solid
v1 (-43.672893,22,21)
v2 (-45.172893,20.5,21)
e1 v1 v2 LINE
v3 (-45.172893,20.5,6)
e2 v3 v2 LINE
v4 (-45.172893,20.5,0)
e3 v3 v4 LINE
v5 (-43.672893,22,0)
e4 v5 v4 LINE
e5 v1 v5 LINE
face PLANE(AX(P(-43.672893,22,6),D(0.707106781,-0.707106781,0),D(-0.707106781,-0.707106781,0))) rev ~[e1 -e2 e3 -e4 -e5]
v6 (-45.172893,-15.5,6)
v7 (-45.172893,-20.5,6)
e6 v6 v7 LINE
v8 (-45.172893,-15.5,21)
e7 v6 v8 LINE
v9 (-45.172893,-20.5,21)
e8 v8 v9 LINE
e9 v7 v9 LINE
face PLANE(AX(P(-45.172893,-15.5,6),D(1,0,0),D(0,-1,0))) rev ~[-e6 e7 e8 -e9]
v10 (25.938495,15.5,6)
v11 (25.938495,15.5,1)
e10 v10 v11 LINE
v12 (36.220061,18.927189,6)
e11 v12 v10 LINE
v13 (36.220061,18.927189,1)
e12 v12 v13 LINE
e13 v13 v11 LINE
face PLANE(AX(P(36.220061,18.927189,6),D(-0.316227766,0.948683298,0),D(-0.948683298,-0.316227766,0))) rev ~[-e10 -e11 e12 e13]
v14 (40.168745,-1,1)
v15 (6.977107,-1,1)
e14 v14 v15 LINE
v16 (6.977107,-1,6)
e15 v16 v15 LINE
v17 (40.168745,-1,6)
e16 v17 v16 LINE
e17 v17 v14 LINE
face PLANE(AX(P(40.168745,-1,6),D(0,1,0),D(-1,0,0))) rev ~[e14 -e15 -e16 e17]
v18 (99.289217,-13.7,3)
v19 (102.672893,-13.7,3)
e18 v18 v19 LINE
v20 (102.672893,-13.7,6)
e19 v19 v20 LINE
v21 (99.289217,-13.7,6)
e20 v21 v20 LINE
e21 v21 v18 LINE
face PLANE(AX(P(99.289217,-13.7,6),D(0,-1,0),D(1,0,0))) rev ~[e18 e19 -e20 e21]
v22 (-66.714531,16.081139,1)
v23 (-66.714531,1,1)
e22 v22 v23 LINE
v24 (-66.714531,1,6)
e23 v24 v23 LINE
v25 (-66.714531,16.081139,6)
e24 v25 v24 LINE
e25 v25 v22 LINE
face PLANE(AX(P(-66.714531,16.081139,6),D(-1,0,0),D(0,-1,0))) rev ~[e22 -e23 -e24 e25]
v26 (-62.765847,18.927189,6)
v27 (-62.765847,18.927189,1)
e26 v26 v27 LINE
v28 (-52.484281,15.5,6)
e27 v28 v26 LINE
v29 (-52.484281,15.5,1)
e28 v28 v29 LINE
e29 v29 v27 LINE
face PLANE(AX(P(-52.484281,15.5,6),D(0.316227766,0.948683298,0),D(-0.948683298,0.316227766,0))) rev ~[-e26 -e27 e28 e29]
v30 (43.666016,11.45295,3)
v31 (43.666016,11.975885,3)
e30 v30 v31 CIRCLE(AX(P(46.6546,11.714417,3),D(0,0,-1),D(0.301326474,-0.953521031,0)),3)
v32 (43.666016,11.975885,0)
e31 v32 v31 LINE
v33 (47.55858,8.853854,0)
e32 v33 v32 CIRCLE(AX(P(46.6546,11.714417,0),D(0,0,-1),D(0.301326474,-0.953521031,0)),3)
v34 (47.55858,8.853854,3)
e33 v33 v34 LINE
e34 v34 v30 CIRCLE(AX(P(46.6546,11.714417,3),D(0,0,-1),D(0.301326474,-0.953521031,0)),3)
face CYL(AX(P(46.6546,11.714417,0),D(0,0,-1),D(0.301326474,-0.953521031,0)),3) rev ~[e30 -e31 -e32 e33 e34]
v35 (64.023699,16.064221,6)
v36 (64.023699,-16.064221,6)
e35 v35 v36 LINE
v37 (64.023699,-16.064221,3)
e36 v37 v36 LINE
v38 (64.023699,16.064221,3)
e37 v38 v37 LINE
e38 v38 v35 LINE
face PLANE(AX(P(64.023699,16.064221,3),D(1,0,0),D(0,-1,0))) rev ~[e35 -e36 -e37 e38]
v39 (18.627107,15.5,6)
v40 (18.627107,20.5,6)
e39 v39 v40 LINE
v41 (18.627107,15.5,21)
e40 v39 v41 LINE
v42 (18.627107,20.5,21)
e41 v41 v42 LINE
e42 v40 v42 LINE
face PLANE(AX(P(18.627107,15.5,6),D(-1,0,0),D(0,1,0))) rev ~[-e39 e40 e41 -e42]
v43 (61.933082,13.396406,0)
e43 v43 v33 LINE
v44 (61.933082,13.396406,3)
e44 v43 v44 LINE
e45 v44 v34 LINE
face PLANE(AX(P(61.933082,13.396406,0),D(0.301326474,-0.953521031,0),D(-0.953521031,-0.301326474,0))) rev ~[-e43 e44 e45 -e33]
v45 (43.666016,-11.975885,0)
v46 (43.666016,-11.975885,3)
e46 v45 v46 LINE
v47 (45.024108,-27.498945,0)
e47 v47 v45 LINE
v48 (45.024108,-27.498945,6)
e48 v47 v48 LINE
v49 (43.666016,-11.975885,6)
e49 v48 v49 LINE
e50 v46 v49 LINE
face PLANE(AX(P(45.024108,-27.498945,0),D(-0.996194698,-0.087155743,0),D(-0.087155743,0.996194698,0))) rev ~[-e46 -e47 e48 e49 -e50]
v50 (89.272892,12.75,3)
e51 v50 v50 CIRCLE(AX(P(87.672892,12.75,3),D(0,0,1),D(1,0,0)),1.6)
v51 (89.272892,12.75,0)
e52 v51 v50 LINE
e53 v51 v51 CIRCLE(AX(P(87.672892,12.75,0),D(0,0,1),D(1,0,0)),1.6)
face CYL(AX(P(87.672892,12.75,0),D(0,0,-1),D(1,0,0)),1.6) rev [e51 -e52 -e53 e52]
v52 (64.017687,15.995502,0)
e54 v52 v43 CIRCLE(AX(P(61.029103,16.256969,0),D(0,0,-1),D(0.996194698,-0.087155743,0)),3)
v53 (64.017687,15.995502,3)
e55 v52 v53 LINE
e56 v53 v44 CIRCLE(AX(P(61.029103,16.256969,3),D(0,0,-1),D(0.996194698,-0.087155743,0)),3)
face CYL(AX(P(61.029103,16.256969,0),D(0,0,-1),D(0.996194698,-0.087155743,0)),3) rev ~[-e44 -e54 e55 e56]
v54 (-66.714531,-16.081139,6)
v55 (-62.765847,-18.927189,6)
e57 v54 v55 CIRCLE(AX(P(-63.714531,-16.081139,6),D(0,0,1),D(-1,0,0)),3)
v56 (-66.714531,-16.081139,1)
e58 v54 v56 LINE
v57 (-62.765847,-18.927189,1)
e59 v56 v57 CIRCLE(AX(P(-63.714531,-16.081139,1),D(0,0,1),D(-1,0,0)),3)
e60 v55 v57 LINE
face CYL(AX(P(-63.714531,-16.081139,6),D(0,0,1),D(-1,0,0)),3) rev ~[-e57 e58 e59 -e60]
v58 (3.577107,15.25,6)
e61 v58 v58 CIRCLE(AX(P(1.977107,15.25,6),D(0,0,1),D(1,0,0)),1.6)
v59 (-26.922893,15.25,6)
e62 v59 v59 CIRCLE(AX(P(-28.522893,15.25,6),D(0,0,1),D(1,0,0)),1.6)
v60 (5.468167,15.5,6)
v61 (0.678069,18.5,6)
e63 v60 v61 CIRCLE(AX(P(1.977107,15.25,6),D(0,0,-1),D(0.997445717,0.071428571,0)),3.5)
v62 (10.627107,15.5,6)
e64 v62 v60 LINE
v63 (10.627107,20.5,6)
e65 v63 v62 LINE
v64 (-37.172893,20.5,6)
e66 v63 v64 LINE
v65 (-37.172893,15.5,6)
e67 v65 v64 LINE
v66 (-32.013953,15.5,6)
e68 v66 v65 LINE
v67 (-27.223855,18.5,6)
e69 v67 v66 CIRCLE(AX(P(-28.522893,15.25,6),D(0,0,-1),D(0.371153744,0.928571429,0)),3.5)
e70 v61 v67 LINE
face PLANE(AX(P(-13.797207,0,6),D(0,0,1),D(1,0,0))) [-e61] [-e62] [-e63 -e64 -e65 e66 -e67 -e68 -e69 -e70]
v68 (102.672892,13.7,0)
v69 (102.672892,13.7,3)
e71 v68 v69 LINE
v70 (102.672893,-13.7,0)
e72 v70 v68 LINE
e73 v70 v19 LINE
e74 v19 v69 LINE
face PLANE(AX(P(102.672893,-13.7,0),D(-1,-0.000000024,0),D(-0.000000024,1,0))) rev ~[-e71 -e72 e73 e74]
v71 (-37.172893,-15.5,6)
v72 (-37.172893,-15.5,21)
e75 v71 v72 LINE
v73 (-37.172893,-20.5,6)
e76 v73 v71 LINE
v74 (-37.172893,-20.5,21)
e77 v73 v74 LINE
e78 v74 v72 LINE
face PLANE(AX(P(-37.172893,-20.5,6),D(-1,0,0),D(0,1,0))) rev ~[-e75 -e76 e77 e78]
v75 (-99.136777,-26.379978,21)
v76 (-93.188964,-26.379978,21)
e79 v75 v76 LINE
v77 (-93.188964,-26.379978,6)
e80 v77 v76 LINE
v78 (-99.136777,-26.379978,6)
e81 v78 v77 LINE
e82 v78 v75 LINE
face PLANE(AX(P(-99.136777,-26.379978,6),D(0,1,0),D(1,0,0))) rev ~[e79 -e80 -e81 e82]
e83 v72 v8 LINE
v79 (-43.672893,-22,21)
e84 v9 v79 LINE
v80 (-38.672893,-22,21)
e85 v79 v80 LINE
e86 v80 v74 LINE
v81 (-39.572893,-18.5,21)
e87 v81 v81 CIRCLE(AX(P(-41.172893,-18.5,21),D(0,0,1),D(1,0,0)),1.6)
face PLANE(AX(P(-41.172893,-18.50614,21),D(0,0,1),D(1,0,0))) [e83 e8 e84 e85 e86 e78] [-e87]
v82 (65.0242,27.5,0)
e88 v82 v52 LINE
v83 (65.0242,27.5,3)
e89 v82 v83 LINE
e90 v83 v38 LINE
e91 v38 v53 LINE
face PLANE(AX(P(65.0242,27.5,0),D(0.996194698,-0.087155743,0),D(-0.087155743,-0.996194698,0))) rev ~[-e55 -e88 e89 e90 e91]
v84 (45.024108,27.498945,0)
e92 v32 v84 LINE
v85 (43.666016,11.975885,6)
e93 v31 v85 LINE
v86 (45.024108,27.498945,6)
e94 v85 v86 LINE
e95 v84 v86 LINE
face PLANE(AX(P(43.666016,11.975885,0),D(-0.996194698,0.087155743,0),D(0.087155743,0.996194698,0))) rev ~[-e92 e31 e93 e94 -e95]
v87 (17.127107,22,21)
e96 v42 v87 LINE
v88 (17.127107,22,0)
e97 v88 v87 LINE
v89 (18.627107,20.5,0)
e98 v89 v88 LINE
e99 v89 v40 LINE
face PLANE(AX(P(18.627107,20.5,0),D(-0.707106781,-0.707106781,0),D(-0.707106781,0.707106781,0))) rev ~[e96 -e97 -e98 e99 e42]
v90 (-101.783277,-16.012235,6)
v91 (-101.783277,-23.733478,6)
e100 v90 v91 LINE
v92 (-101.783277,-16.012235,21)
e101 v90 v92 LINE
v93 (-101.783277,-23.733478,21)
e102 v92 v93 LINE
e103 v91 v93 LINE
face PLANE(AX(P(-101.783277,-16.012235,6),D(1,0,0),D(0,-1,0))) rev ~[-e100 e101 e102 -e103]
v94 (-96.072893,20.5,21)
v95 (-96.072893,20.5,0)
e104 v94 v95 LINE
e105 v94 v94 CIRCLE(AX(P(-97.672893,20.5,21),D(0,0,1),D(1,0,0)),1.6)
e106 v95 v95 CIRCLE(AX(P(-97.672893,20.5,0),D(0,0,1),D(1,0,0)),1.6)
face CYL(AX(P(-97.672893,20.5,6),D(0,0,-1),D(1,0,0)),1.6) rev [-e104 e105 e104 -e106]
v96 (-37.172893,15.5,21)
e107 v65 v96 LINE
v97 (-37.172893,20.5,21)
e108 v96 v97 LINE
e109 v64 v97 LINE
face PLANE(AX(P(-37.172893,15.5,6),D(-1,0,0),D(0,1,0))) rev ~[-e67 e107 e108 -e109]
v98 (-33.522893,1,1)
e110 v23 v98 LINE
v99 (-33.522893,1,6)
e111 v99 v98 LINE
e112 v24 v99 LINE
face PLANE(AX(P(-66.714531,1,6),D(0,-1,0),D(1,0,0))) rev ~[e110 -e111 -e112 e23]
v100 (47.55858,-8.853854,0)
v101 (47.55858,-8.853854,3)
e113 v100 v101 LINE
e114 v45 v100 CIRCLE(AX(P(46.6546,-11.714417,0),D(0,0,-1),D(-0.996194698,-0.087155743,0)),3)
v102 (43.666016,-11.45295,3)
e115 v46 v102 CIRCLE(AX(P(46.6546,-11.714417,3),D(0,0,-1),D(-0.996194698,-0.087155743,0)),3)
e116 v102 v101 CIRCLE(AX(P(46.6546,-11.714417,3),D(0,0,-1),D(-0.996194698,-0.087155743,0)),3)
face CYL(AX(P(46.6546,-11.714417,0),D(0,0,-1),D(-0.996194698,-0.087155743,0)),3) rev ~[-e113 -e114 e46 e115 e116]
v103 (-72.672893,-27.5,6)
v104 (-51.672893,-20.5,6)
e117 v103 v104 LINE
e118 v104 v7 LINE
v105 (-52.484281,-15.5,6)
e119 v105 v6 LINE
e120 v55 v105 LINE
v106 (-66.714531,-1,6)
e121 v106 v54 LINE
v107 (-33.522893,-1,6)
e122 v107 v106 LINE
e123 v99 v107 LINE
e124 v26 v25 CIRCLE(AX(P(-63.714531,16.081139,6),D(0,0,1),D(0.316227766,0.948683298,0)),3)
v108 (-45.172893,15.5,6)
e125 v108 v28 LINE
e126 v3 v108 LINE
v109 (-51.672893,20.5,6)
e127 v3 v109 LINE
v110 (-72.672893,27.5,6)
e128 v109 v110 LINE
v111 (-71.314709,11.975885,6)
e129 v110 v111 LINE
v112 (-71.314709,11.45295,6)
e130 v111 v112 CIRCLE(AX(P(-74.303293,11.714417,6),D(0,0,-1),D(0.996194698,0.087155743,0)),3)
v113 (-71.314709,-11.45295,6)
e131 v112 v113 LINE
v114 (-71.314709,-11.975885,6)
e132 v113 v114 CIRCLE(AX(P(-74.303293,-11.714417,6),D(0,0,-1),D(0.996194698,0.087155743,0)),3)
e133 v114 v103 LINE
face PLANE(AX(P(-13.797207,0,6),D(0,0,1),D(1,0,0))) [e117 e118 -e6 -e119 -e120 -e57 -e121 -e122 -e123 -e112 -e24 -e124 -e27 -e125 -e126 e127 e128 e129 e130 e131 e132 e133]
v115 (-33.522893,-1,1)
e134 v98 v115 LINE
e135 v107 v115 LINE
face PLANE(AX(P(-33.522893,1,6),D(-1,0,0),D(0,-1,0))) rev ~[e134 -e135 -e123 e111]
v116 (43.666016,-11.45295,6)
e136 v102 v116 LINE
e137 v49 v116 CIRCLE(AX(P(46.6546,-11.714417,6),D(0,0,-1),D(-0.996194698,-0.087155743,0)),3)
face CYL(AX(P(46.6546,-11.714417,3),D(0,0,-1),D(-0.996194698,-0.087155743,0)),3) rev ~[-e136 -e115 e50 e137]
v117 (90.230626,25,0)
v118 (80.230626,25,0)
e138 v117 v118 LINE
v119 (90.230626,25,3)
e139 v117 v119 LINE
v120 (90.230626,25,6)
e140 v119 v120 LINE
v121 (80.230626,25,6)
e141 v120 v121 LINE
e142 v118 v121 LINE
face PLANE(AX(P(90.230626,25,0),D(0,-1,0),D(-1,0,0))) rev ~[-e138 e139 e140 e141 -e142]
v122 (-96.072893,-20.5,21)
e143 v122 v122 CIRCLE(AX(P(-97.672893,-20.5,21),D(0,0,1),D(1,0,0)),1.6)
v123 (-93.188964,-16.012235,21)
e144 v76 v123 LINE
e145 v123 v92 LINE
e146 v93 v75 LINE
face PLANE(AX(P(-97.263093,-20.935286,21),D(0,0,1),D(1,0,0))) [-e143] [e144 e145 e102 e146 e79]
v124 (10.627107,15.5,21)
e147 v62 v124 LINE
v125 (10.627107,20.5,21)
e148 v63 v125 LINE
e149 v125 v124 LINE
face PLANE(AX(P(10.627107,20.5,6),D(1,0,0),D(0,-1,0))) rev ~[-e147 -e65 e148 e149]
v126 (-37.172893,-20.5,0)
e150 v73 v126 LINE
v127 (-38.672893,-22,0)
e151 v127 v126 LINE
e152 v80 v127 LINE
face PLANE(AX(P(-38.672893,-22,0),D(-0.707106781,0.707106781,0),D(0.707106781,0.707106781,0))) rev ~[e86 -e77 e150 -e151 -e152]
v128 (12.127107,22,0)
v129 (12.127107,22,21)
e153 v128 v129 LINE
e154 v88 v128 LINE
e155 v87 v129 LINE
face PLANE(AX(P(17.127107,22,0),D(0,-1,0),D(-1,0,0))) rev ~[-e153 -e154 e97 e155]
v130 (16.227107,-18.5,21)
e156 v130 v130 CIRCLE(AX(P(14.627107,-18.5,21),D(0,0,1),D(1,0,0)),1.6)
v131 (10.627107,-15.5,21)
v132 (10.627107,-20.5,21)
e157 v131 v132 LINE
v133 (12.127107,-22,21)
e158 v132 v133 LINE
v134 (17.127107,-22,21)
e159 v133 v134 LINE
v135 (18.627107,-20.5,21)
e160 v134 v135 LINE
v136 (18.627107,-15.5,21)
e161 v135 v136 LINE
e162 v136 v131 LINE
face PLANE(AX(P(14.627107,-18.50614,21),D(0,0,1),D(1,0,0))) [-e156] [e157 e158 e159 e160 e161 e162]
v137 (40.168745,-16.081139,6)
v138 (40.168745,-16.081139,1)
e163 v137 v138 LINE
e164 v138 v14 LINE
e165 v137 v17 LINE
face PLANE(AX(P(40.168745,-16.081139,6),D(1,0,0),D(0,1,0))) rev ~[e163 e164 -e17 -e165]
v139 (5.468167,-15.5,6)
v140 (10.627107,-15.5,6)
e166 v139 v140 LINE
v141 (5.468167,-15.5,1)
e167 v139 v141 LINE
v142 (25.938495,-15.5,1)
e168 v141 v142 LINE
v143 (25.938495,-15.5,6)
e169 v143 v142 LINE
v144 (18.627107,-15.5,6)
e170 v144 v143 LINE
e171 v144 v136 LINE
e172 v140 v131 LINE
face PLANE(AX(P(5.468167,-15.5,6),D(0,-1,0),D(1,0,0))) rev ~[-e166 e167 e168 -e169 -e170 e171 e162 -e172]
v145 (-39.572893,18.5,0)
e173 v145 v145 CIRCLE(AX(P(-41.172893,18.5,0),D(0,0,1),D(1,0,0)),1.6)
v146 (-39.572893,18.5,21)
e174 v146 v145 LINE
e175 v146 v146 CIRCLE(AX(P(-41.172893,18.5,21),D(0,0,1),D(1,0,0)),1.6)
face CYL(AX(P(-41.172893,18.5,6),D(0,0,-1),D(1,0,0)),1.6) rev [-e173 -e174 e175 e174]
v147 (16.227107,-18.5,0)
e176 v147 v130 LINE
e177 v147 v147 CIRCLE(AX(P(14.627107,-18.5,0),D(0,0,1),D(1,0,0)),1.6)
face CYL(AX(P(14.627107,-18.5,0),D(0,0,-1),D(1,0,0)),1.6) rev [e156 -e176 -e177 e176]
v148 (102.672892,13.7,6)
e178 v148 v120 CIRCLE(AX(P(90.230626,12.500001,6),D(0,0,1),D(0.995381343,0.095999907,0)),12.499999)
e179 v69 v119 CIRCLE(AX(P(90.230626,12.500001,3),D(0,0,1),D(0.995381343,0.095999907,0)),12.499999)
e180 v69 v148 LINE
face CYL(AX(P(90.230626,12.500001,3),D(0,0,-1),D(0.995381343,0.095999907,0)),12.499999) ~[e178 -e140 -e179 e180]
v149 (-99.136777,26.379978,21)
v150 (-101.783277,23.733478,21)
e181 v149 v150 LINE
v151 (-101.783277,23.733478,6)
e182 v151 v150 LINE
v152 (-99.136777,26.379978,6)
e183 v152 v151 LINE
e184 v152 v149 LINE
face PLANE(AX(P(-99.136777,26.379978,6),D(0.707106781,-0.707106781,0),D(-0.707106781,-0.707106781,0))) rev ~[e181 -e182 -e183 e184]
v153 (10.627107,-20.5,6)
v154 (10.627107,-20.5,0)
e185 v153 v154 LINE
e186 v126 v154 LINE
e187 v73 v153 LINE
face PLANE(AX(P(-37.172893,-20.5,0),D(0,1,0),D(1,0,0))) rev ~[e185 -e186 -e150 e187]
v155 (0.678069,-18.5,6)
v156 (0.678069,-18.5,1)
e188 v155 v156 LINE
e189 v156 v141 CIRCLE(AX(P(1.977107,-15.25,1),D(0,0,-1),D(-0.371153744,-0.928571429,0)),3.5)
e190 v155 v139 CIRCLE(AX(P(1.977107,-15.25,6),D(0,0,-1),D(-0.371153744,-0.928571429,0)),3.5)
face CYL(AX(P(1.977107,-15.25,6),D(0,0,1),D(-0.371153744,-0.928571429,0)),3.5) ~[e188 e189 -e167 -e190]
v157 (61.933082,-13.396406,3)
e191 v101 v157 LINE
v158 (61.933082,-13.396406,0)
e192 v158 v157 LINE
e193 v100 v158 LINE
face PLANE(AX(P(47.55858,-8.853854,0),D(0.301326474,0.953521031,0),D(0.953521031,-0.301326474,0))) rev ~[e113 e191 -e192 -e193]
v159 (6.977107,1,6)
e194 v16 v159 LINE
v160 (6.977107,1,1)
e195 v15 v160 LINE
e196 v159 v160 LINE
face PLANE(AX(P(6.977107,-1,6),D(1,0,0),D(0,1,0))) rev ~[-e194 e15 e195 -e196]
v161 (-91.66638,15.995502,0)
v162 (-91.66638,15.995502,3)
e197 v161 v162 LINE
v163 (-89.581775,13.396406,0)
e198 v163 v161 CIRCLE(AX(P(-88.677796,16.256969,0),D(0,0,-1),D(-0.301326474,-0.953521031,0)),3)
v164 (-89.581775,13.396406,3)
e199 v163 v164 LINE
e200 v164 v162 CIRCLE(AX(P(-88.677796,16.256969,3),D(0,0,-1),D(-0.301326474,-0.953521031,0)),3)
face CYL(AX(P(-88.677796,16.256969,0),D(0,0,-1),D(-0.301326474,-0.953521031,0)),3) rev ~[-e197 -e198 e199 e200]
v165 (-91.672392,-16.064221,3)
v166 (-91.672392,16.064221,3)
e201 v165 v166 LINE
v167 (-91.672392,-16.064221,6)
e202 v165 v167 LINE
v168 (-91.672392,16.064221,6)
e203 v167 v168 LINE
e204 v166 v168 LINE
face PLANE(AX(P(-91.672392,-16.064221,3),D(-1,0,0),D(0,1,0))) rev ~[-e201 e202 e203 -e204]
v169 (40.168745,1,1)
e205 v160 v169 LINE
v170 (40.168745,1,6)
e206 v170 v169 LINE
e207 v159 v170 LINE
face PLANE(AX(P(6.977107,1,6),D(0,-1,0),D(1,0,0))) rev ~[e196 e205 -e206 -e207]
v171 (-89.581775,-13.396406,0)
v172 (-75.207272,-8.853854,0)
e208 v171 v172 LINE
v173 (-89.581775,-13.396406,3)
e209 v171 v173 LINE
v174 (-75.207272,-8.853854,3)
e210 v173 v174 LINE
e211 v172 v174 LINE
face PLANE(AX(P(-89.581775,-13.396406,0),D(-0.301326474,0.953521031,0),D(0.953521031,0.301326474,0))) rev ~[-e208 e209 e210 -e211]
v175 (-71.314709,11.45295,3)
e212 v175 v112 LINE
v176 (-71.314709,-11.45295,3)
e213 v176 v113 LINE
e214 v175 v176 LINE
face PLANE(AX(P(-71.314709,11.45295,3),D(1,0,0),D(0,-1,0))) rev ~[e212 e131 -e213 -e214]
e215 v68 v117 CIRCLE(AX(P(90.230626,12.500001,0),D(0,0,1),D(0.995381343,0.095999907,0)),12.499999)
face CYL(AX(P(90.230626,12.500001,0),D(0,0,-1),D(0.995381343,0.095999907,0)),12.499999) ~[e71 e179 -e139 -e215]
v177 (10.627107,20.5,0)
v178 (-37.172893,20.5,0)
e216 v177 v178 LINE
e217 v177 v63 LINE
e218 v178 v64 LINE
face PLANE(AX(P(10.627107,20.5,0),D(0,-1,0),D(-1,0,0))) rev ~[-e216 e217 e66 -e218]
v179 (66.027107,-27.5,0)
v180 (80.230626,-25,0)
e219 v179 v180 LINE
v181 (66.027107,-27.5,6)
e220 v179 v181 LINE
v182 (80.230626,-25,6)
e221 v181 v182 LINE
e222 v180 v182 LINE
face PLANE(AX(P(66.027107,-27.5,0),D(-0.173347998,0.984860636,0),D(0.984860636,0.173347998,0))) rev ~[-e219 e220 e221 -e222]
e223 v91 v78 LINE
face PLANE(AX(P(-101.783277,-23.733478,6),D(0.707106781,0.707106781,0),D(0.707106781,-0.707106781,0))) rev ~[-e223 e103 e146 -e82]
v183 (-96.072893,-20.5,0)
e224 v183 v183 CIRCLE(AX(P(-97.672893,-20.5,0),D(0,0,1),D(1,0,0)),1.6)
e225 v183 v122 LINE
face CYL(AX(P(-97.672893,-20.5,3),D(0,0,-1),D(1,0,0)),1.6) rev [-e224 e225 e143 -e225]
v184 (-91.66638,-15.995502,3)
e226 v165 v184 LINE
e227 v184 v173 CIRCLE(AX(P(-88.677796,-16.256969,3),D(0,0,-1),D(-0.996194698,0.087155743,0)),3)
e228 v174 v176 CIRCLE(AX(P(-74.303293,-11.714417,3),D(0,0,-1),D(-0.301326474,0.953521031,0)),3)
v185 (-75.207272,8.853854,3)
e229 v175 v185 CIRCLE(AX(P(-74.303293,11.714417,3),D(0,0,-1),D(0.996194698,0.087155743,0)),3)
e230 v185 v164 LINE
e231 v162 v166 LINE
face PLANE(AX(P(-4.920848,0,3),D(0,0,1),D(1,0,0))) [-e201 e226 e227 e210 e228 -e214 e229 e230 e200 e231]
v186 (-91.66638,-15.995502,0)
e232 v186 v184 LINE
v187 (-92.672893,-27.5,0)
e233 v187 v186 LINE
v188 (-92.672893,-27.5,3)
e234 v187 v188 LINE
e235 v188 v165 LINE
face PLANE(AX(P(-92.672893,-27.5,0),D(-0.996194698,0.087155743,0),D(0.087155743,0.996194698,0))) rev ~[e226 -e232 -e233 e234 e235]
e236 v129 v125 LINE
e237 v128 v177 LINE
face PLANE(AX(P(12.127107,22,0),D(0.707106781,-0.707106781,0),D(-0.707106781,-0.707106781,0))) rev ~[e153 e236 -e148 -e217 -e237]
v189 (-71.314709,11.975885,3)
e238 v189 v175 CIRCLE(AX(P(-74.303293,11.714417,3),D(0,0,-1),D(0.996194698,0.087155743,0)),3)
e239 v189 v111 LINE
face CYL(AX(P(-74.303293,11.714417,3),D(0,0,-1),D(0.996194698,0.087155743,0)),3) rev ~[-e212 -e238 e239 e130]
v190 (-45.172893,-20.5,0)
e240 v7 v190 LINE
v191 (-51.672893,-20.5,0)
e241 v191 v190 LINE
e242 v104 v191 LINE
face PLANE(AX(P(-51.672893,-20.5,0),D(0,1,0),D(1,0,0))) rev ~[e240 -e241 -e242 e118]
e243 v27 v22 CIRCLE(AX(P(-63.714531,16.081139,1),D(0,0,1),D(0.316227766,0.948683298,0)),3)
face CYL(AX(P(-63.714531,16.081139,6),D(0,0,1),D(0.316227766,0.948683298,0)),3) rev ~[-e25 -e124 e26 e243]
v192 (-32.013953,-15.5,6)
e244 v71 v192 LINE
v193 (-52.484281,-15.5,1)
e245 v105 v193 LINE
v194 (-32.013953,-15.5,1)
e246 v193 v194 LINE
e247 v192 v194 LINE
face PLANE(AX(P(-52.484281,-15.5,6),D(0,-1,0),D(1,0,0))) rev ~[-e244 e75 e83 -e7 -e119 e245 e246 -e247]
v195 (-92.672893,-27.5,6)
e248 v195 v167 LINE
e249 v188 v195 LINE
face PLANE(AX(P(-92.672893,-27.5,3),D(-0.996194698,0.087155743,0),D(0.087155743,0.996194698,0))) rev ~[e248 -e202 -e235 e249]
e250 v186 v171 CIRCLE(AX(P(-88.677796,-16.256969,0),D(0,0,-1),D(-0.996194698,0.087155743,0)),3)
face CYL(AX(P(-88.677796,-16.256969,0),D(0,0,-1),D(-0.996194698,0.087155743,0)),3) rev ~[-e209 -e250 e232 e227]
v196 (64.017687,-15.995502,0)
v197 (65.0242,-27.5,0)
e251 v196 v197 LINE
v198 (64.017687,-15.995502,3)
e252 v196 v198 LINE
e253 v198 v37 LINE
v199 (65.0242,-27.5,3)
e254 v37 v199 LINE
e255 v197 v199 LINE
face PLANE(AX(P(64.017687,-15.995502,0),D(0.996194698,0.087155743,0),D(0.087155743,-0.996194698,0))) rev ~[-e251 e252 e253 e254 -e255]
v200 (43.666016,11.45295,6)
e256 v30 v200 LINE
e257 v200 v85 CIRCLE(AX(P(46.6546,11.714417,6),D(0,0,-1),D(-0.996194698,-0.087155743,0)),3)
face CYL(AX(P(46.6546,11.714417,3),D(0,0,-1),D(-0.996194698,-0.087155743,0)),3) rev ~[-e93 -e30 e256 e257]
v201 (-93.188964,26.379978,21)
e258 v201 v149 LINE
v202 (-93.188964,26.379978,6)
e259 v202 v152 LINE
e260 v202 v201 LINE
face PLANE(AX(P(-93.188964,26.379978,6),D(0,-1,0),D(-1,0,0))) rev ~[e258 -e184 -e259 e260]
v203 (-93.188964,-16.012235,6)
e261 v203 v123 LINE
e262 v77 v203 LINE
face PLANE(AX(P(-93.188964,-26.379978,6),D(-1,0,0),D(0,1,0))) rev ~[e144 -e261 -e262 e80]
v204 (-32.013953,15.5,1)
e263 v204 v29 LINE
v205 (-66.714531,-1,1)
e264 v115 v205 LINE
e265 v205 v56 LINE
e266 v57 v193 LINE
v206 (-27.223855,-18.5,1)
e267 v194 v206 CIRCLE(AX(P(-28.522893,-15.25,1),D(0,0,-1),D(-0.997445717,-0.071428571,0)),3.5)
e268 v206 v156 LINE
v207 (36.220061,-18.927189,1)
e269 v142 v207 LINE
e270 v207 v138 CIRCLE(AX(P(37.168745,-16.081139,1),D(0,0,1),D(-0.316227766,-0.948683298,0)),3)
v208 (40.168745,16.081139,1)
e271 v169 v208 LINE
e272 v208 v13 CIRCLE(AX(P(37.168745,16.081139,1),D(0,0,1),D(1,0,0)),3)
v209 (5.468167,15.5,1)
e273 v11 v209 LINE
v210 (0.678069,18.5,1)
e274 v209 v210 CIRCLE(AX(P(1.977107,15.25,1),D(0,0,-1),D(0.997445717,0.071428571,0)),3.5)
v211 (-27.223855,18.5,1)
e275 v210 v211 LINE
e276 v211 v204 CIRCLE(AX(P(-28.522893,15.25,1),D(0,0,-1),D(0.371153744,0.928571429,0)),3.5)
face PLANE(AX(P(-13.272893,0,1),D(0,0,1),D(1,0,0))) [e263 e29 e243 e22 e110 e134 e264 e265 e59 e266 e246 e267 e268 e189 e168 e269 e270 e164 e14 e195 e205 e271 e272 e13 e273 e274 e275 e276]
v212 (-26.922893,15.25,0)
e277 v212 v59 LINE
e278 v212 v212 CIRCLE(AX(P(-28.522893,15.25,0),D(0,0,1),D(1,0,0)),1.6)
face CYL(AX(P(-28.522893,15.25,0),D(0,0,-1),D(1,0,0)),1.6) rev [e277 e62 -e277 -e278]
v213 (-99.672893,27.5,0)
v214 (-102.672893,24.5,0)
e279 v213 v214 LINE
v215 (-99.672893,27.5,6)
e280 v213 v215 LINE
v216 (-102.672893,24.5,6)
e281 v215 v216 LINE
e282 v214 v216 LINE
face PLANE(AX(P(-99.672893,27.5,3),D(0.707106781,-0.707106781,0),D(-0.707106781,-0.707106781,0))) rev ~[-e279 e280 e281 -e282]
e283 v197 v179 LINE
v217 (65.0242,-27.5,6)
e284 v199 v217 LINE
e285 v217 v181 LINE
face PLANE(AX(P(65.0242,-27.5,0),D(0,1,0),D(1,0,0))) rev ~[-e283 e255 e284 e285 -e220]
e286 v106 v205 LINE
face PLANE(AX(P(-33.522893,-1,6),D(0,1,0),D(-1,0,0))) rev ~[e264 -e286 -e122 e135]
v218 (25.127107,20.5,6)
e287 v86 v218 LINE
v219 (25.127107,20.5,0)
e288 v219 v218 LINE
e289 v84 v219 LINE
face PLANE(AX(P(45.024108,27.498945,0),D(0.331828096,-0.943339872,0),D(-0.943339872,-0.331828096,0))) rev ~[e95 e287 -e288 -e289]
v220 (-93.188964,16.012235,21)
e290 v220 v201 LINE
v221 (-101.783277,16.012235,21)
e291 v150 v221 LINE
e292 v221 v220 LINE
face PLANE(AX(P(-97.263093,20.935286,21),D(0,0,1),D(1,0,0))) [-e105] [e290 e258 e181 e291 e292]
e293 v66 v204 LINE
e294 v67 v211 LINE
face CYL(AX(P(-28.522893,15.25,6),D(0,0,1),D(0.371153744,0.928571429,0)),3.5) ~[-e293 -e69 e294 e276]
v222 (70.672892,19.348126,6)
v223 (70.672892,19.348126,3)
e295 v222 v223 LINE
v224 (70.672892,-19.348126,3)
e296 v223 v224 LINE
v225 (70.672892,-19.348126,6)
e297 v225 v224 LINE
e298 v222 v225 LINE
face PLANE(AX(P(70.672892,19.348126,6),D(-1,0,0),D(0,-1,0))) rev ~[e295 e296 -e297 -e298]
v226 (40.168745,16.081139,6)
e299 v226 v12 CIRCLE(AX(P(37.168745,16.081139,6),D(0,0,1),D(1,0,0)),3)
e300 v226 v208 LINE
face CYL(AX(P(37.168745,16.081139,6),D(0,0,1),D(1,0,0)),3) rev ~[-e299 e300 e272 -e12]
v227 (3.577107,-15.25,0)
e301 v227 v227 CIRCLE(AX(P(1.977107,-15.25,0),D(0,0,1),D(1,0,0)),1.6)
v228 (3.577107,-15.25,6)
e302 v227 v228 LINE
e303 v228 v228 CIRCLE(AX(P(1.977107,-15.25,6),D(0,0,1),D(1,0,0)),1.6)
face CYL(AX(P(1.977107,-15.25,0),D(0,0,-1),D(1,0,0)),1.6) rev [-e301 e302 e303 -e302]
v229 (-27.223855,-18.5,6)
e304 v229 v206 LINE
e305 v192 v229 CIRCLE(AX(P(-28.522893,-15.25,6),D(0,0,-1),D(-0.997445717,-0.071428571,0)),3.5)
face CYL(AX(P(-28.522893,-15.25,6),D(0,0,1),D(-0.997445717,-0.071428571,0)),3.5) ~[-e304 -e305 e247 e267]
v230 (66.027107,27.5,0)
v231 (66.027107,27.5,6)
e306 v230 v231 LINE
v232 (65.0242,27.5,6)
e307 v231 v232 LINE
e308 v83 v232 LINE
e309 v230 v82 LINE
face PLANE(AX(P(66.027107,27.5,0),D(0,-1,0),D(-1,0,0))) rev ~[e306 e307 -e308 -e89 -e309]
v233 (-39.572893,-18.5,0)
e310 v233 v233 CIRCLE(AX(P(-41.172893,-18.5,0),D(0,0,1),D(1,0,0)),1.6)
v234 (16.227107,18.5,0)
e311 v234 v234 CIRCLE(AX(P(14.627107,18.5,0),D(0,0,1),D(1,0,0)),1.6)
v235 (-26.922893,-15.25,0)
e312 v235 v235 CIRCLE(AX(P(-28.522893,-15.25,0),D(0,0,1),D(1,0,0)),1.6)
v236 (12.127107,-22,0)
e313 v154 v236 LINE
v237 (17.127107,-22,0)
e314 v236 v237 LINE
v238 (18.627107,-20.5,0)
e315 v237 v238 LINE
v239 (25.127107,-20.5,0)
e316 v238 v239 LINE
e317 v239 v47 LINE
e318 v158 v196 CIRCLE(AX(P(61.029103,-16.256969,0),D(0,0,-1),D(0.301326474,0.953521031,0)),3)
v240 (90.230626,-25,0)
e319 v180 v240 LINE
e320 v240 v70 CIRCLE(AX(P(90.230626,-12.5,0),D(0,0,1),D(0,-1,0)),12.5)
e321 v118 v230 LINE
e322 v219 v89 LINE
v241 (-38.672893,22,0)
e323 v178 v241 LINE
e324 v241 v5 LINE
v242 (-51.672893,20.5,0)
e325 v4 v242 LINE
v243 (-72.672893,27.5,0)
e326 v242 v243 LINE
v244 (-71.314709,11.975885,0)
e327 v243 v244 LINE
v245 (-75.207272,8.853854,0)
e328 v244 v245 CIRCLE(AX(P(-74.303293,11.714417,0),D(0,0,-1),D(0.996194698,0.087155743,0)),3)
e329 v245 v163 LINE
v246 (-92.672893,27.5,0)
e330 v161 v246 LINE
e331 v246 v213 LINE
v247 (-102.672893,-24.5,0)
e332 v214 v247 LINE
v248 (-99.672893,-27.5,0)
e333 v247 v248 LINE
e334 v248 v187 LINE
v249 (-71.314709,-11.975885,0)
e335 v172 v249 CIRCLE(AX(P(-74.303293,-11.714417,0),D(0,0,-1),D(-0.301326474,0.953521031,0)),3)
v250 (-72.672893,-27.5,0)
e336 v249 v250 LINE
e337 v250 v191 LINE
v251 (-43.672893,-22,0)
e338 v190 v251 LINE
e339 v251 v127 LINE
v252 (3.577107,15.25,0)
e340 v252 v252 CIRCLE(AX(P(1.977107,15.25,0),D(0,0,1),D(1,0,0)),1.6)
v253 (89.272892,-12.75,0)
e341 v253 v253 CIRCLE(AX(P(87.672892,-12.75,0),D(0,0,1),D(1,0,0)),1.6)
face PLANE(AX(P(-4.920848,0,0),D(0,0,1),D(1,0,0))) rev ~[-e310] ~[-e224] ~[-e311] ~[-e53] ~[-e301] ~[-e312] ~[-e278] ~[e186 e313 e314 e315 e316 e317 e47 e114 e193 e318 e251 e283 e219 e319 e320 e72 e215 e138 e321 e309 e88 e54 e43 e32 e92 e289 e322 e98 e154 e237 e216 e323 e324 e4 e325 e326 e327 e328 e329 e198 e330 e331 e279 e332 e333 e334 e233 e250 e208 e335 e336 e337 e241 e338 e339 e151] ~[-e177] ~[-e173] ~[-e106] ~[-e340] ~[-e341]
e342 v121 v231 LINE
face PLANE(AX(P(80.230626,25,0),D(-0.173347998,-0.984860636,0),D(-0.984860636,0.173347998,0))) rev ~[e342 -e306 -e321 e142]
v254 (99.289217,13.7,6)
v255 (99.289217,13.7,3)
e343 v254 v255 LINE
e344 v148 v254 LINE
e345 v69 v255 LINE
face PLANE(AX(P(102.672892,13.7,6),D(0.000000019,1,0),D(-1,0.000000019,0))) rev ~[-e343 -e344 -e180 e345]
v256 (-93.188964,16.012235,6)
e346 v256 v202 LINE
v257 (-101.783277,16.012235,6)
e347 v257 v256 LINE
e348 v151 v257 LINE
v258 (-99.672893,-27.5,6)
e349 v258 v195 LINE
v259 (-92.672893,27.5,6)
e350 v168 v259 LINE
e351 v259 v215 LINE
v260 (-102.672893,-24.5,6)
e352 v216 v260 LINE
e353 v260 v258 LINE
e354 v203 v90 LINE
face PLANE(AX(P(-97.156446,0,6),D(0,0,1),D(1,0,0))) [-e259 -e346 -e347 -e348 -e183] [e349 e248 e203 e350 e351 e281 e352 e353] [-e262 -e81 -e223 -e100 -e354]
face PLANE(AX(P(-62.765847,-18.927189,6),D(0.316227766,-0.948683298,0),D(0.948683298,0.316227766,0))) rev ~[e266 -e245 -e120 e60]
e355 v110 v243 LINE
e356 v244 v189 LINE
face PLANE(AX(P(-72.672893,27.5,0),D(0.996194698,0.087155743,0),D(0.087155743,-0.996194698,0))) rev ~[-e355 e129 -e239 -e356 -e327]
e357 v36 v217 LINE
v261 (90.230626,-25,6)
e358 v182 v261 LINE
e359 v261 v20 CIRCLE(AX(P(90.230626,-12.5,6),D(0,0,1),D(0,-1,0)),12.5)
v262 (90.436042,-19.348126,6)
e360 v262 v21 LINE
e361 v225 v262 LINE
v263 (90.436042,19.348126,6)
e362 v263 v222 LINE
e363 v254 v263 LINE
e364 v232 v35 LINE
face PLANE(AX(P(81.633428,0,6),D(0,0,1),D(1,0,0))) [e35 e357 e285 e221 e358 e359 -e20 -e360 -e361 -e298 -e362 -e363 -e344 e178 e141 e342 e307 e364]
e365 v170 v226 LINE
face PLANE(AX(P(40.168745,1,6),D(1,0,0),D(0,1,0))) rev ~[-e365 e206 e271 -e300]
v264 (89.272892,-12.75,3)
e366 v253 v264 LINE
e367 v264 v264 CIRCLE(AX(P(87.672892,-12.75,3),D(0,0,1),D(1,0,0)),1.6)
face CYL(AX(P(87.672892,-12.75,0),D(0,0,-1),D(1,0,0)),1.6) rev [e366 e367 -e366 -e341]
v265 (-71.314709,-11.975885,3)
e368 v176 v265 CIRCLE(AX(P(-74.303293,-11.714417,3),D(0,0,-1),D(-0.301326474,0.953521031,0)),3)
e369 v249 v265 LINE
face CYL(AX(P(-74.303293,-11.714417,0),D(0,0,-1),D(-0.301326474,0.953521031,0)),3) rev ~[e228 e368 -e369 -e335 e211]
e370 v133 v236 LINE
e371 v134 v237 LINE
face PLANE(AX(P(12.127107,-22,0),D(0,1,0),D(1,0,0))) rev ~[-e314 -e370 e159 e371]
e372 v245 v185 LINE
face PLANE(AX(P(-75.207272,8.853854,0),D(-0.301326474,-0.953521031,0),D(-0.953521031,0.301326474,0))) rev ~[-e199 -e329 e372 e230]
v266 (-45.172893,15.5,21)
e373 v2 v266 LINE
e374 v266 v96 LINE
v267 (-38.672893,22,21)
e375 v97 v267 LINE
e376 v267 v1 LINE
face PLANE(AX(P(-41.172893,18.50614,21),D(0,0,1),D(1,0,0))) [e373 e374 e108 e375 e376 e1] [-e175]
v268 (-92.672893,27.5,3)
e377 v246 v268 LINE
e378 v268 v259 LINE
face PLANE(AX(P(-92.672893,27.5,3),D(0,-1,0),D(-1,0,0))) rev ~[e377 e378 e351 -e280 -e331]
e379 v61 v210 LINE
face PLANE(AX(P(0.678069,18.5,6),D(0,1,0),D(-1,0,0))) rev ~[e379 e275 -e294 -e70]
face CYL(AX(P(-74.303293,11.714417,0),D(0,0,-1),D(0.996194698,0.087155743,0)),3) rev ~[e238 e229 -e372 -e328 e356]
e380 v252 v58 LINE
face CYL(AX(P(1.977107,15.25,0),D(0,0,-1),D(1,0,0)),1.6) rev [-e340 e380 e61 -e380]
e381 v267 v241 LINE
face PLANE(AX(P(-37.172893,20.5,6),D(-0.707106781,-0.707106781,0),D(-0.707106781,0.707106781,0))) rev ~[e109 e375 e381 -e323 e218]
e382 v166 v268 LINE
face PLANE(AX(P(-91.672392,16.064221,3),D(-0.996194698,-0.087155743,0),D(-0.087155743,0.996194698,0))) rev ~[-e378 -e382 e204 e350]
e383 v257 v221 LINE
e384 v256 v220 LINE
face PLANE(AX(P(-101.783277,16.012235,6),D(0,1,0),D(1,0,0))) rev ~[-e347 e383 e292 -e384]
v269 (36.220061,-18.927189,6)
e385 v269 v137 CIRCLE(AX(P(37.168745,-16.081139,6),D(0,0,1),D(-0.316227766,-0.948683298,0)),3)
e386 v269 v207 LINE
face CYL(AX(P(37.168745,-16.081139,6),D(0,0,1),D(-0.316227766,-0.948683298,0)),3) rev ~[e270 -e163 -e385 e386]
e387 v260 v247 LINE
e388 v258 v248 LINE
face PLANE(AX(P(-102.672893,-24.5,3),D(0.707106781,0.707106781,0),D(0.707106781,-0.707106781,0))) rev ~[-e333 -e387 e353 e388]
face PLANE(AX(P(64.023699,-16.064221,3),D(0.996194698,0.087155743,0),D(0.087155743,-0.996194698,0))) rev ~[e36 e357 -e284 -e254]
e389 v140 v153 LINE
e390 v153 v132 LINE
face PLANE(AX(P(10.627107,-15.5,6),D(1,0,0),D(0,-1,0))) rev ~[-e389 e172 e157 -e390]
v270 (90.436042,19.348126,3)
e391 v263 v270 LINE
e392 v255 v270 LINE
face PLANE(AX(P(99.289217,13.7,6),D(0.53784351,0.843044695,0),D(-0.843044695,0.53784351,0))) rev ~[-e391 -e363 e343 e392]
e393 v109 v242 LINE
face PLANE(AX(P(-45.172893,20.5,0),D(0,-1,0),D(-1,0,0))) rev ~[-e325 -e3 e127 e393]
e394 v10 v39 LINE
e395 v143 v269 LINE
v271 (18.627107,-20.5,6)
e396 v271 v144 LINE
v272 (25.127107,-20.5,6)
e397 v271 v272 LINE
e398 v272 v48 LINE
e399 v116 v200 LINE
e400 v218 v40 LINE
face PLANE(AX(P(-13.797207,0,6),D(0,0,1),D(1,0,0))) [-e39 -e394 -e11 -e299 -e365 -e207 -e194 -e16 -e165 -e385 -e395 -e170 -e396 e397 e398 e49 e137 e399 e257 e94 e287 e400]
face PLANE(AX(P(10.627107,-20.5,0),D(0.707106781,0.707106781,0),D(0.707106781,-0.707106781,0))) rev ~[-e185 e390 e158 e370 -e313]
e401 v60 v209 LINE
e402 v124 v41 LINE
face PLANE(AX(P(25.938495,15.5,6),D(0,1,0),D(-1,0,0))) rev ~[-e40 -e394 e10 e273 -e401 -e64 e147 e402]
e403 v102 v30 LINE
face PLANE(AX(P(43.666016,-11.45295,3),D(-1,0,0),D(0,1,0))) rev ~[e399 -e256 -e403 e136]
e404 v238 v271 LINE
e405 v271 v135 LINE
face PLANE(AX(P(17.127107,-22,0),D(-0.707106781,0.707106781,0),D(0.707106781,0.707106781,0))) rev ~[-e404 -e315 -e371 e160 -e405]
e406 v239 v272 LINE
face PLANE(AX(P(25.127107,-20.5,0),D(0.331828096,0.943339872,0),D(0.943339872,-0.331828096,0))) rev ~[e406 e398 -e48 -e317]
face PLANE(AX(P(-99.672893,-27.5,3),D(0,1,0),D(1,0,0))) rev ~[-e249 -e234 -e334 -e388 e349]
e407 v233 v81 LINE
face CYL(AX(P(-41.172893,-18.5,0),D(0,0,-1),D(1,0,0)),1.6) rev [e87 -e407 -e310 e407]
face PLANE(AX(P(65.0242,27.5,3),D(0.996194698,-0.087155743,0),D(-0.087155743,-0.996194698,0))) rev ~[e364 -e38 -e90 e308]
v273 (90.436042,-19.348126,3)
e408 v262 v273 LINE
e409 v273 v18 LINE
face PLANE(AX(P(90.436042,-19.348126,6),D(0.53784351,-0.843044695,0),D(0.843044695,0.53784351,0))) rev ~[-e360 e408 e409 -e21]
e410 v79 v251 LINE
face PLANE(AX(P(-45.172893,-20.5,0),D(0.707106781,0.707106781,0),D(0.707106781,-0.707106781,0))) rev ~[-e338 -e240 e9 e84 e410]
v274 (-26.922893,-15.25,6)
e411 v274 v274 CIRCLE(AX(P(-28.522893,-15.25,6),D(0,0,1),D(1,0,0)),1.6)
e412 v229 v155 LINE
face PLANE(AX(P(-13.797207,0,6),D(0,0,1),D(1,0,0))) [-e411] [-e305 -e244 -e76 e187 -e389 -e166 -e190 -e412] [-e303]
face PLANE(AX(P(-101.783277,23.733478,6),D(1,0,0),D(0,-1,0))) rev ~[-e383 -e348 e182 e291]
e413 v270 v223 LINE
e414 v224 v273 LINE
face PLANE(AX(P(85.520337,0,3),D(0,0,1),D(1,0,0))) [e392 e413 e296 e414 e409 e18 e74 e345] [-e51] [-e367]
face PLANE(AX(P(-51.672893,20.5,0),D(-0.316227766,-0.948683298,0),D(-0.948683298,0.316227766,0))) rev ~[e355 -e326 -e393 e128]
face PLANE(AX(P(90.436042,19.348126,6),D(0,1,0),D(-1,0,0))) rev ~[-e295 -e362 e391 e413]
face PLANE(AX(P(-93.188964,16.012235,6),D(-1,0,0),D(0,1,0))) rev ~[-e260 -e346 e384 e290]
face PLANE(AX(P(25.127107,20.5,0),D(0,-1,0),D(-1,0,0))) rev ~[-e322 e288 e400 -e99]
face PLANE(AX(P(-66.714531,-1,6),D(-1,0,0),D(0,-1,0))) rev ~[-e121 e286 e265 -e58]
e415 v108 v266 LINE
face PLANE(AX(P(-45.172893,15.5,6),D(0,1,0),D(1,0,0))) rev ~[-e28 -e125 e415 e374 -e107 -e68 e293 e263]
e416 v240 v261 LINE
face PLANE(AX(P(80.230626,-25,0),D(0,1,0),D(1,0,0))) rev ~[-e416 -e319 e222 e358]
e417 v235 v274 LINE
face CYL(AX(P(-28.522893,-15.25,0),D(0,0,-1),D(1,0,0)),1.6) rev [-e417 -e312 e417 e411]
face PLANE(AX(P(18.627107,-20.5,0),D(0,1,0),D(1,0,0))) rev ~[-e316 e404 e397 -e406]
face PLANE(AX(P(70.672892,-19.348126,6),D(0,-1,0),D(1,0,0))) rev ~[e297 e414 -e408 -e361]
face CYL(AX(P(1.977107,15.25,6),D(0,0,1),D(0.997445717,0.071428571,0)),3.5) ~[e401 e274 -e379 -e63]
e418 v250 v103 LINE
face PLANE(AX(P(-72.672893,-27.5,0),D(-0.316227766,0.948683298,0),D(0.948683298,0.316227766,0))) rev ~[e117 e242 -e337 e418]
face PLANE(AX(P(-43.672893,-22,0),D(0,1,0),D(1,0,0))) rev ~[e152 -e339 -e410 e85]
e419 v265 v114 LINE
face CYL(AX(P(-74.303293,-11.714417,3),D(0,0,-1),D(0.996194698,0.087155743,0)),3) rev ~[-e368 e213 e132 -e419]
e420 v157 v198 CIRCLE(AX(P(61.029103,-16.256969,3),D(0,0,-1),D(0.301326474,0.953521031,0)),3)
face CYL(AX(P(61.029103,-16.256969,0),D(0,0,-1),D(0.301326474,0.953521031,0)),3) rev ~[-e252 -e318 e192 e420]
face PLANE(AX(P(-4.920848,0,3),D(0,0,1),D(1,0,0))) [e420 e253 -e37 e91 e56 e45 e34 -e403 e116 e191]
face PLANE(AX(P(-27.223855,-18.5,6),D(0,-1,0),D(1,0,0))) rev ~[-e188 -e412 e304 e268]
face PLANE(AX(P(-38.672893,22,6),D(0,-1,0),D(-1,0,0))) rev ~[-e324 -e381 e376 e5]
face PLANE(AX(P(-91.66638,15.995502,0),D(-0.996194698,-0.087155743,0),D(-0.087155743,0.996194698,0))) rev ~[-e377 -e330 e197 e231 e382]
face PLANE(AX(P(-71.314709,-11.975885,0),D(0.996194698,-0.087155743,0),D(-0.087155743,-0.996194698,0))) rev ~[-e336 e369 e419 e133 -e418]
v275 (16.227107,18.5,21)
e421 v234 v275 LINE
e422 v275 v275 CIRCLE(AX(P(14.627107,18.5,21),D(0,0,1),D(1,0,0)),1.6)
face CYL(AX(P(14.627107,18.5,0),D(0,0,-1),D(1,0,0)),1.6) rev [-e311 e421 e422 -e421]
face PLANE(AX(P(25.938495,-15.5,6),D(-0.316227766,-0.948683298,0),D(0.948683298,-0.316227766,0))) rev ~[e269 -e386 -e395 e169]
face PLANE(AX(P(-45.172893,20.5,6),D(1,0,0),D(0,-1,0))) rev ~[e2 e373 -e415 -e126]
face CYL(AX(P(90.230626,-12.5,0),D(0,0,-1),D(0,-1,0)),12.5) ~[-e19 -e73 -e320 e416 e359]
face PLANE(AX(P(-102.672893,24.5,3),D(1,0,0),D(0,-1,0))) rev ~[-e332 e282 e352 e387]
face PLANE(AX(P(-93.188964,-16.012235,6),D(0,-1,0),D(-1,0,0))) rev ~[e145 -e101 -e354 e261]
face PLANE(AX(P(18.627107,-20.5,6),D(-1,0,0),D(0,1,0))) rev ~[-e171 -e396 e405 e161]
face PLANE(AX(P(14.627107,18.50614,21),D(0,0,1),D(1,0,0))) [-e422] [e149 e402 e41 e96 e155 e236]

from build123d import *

# Parameters (mm, degrees)
F0_R      = 1.6
F1_DEPTH  = 3
F2_R      = 1.6
F3_DEPTH  = 3
F5_DEPTH  = 5
F6_R      = 1.6
F7_DEPTH  = 15
F8_R      = 1.6
F9_DEPTH  = 15
F10_R     = 1.6
F11_DEPTH = 3


# Not quite as in the source:
# - ends of sketch curves that miss each other by under 0.0002 mm in the source are joined


with BuildPart() as f1:
    # F0 (on Top) → F1 (new body)
    with BuildSketch(Plane.XY):
        with BuildLine():
            Line((14.627107, -22), (17.127107, -22))
            Line((17.127107, -22), (18.627107, -20.5))
            Line((18.627107, -20.5), (25.127107, -20.5))
            Line((25.127107, -20.5), (45.0241078911, -27.4989450371))
            Line((45.0241078911, -27.4989450371), (43.6660160882, -11.9758846978))
            ThreePointArc((43.6660160882, -11.9758846978), (44.7775912608, -9.3741530598), (47.5585796034, -8.853854377))
            Line((47.5585796034, -8.853854377), (61.9330823218, -13.3964056938))
            ThreePointArc((61.9330823218, -13.3964056938), (63.3693673107, -14.3799598647), (64.0176869952, -15.9955015581))
            Line((64.0176869952, -15.9955015581), (65.0242001884, -27.5))
            Line((65.0242001884, -27.5), (66.027107, -27.5))
            Line((66.027107, -27.5), (80.230626, -25))
            Line((80.230626, -25), (90.230626, -25))
            ThreePointArc((90.230626, -25), (98.634494133, -21.7533777834), (102.6728926683, -13.7000000645))
            Line((102.6728926683, -13.7000000645), (102.672892, 13.7))
            ThreePointArc((102.672892, 13.7), (98.634494133, 21.7533777834), (90.230626, 25))
            Line((90.230626, 25), (80.230626, 25))
            Line((80.230626, 25), (66.027107, 27.5))
            Line((66.027107, 27.5), (65.0242001884, 27.5))
            Line((65.0242001884, 27.5), (64.0176869952, 15.9955015581))
            ThreePointArc((64.0176869952, 15.9955015581), (63.3693673107, 14.3799598647), (61.9330823218, 13.3964056938))
            Line((61.9330823218, 13.3964056938), (47.5585796034, 8.853854377))
            ThreePointArc((47.5585796034, 8.853854377), (44.7775912608, 9.3741530598), (43.6660160882, 11.9758846978))
            Line((43.6660160882, 11.9758846978), (45.0241078911, 27.4989450371))
            Line((45.0241078911, 27.4989450371), (25.127107, 20.5))
            Line((25.127107, 20.5), (18.627107, 20.5))
            Line((18.627107, 20.5), (17.127107, 22))
            Line((17.127107, 22), (14.627107, 22))
            Line((14.627107, 22), (12.127107, 22))
            Line((12.127107, 22), (10.627107, 20.5))
            Line((10.627107, 20.5), (-37.172893, 20.5))
            Line((-37.172893, 20.5), (-38.672893, 22))
            Line((-38.672893, 22), (-43.672893, 22))
            Line((-43.672893, 22), (-45.172893, 20.5))
            Line((-45.172893, 20.5), (-51.672893, 20.5))
            Line((-51.672893, 20.5), (-72.672893, 27.5))
            Line((-72.672893, 27.5), (-71.3147088998, 11.9758846978))
            ThreePointArc((-71.3147088998, 11.9758846978), (-72.4262840724, 9.3741530598), (-75.207272415, 8.853854377))
            Line((-75.207272415, 8.853854377), (-89.5817751334, 13.3964056938))
            ThreePointArc((-89.5817751334, 13.3964056938), (-91.0180601223, 14.3799598647), (-91.6663798068, 15.9955015581))
            Line((-91.6663798068, 15.9955015581), (-92.672893, 27.5))
            Line((-92.672893, 27.5), (-99.672893, 27.5))
            Line((-99.672893, 27.5), (-102.672893, 24.5))
            Line((-102.672893, 24.5), (-102.672893, -24.5))
            Line((-102.672893, -24.5), (-99.672893, -27.5))
            Line((-99.672893, -27.5), (-92.672893, -27.5))
            Line((-92.672893, -27.5), (-91.6663798068, -15.9955015581))
            ThreePointArc((-91.6663798068, -15.9955015581), (-91.0180601223, -14.3799598647), (-89.5817751334, -13.3964056938))
            Line((-89.5817751334, -13.3964056938), (-75.207272415, -8.853854377))
            ThreePointArc((-75.207272415, -8.853854377), (-72.4262840724, -9.3741530598), (-71.3147088998, -11.9758846978))
            Line((-71.3147088998, -11.9758846978), (-72.672893, -27.5))
            Line((-72.672893, -27.5), (-51.672893, -20.5))
            Line((-51.672893, -20.5), (-45.172893, -20.5))
            Line((-45.172893, -20.5), (-43.672893, -22))
            Line((-43.672893, -22), (-41.172893, -22))
            Line((-41.172893, -22), (-38.672893, -22))
            Line((-38.672893, -22), (-37.172893, -20.5))
            Line((-37.172893, -20.5), (10.627107, -20.5))
            Line((10.627107, -20.5), (12.127107, -22))
            Line((12.127107, -22), (14.627107, -22))
        make_face()
        with Locations((-97.672893, -20.5)):
            Circle(F0_R, mode=Mode.SUBTRACT)
        with Locations((-41.172893, -18.5)):
            Circle(F0_R, mode=Mode.SUBTRACT)
        with Locations((-28.522893, -15.25)):
            Circle(F0_R, mode=Mode.SUBTRACT)
        with Locations((14.627107, -18.5)):
            Circle(F0_R, mode=Mode.SUBTRACT)
        with Locations((1.977107, -15.25)):
            Circle(F0_R, mode=Mode.SUBTRACT)
        with Locations((87.672892, -12.75)):
            Circle(F0_R, mode=Mode.SUBTRACT)
        with Locations((-97.672893, 20.5)):
            Circle(F0_R, mode=Mode.SUBTRACT)
        with Locations((-28.522893, 15.25)):
            Circle(F0_R, mode=Mode.SUBTRACT)
        with Locations((-41.172893, 18.5)):
            Circle(F0_R, mode=Mode.SUBTRACT)
        with Locations((87.672892, 12.75)):
            Circle(F0_R, mode=Mode.SUBTRACT)
        with Locations((1.977107, 15.25)):
            Circle(F0_R, mode=Mode.SUBTRACT)
        with Locations((14.627107, 18.5)):
            Circle(F0_R, mode=Mode.SUBTRACT)
    extrude(amount=F1_DEPTH)

    # F2 (on face) → F3 (join)
    with BuildSketch(Plane.XY.offset(3)):
        Polygon((-91.672392004, -16.0642212863), (-91.672392004, 16.0642212863), (-92.672893, 27.5), (-99.672893, 27.5), (-102.672893, 24.5), (-102.672893, -24.5), (-99.672893, -27.5), (-92.672893, -27.5), align=None)
        with Locations((-97.672893, -20.5)):
            Circle(F2_R, mode=Mode.SUBTRACT)
        with Locations((-97.672893, 20.5)):
            Circle(F2_R, mode=Mode.SUBTRACT)
        with BuildLine():
            ThreePointArc((-71.3147088998, 11.9758846978), (-71.3032929941, 11.7144174696), (-71.3147088998, 11.4529502413))
            Line((-71.3147088998, 11.4529502413), (-71.3147088998, -11.4529502413))
            ThreePointArc((-71.3147088998, -11.4529502413), (-71.3032929941, -11.7144174696), (-71.3147088998, -11.9758846978))
            Line((-71.3147088998, -11.9758846978), (-72.672893, -27.5))
            Line((-72.672893, -27.5), (-51.672893, -20.5))
            Line((-51.672893, -20.5), (-45.172893, -20.5))
            Line((-45.172893, -20.5), (-43.672893, -22))
            Line((-43.672893, -22), (-38.672893, -22))
            Line((-38.672893, -22), (-37.172893, -20.5))
            Line((-37.172893, -20.5), (10.627107, -20.5))
            Line((10.627107, -20.5), (12.127107, -22))
            Line((12.127107, -22), (17.127107, -22))
            Line((17.127107, -22), (18.627107, -20.5))
            Line((18.627107, -20.5), (25.127107, -20.5))
            Line((25.127107, -20.5), (45.0241078911, -27.4989450371))
            Line((45.0241078911, -27.4989450371), (43.6660160882, -11.9758846978))
            ThreePointArc((43.6660160882, -11.9758846978), (43.6546001825, -11.7144174696), (43.6660160882, -11.4529502413))
            Line((43.6660160882, -11.4529502413), (43.6660160882, 11.4529502413))
            ThreePointArc((43.6660160882, 11.4529502413), (43.6546001825, 11.7144174696), (43.6660160882, 11.9758846978))
            Line((43.6660160882, 11.9758846978), (45.0241078911, 27.4989450371))
            Line((45.0241078911, 27.4989450371), (25.127107, 20.5))
            Line((25.127107, 20.5), (18.627107, 20.5))
            Line((18.627107, 20.5), (17.127107, 22))
            Line((17.127107, 22), (12.127107, 22))
            Line((12.127107, 22), (10.627107, 20.5))
            Line((10.627107, 20.5), (-37.172893, 20.5))
            Line((-37.172893, 20.5), (-38.672893, 22))
            Line((-38.672893, 22), (-43.672893, 22))
            Line((-43.672893, 22), (-45.172893, 20.5))
            Line((-45.172893, 20.5), (-51.672893, 20.5))
            Line((-51.672893, 20.5), (-72.672893, 27.5))
            Line((-72.672893, 27.5), (-71.3147088998, 11.9758846978))
        make_face()
        with Locations((-41.172893, -18.5)):
            Circle(F2_R, mode=Mode.SUBTRACT)
        with Locations((-28.522893, -15.25)):
            Circle(F2_R, mode=Mode.SUBTRACT)
        with Locations((14.627107, -18.5)):
            Circle(F2_R, mode=Mode.SUBTRACT)
        with Locations((1.977107, -15.25)):
            Circle(F2_R, mode=Mode.SUBTRACT)
        with Locations((-28.522893, 15.25)):
            Circle(F2_R, mode=Mode.SUBTRACT)
        with Locations((-41.172893, 18.5)):
            Circle(F2_R, mode=Mode.SUBTRACT)
        with Locations((1.977107, 15.25)):
            Circle(F2_R, mode=Mode.SUBTRACT)
        with Locations((14.627107, 18.5)):
            Circle(F2_R, mode=Mode.SUBTRACT)
        with BuildLine():
            Line((65.0242001884, 27.5), (64.0236991924, 16.0642212863))
            Line((64.0236991924, 16.0642212863), (64.0236991924, -16.0642212863))
            Line((64.0236991924, -16.0642212863), (65.0242001884, -27.5))
            Line((65.0242001884, -27.5), (66.027107, -27.5))
            Line((66.027107, -27.5), (80.230626, -25))
            Line((80.230626, -25), (90.230626, -25))
            ThreePointArc((90.230626, -25), (98.634494133, -21.7533777834), (102.6728926683, -13.7000000645))
            Line((102.6728926683, -13.7000000645), (102.672892, 13.7))
            ThreePointArc((102.672892, 13.7), (98.634494037, 21.7533778706), (90.230626, 25))
            Line((90.230626, 25), (80.230626, 25))
            Line((80.230626, 25), (66.027107, 27.5))
            Line((66.027107, 27.5), (65.0242001884, 27.5))
        make_face()
        with Locations((87.672892, -12.75)):
            Circle(F2_R, mode=Mode.SUBTRACT)
        with Locations((87.672892, 12.75)):
            Circle(F2_R, mode=Mode.SUBTRACT)
    extrude(amount=F3_DEPTH)

    # F4 (on face) → F5 (cut)
    with BuildSketch(Plane.XY.offset(6)):
        with BuildLine():
            Line((-52.4842813008, 15.5), (-62.7658474735, 18.9271887242))
            ThreePointArc((-62.7658474735, 18.9271887242), (-65.4686616256, 18.5148653856), (-66.7145307716, 16.0811388301))
            Line((-66.7145307716, 16.0811388301), (-66.7145307716, 1))
            Line((-66.7145307716, 1), (-33.522893, 1))
            Line((-33.522893, 1), (-33.522893, -1))
            Line((-33.522893, -1), (-66.7145307716, -1))
            Line((-66.7145307716, -1), (-66.7145307716, -16.0811388301))
            ThreePointArc((-66.7145307716, -16.0811388301), (-65.4686616256, -18.5148653856), (-62.7658474735, -18.9271887242))
            Line((-62.7658474735, -18.9271887242), (-52.4842813008, -15.5))
            Line((-52.4842813008, -15.5), (-32.0139530109, -15.5))
            ThreePointArc((-32.0139530109, -15.5), (-26.6651416689, -12.2837296159), (-27.2238548943, -18.5))
            Line((-27.2238548943, -18.5), (0.6780688943, -18.5))
            ThreePointArc((0.6780688943, -18.5), (0.1193556689, -12.2837296159), (5.4681670109, -15.5))
            Line((5.4681670109, -15.5), (25.9384953008, -15.5))
            Line((25.9384953008, -15.5), (36.2200614735, -18.9271887242))
            ThreePointArc((36.2200614735, -18.9271887242), (38.9228756256, -18.5148653856), (40.1687447716, -16.0811388301))
            Line((40.1687447716, -16.0811388301), (40.1687447716, -1))
            Line((40.1687447716, -1), (6.977107, -1))
            Line((6.977107, -1), (6.977107, 1))
            Line((6.977107, 1), (40.1687447716, 1))
            Line((40.1687447716, 1), (40.1687447716, 16.0811388301))
            ThreePointArc((40.1687447716, 16.0811388301), (38.9228756256, 18.5148653856), (36.2200614735, 18.9271887242))
            Line((36.2200614735, 18.9271887242), (25.9384953008, 15.5))
            Line((25.9384953008, 15.5), (5.4681670109, 15.5))
            ThreePointArc((5.4681670109, 15.5), (0.1193556689, 12.2837296159), (0.6780688943, 18.5))
            Line((0.6780688943, 18.5), (-27.2238548943, 18.5))
            ThreePointArc((-27.2238548943, 18.5), (-26.6651416689, 12.2837296159), (-32.0139530109, 15.5))
            Line((-32.0139530109, 15.5), (-52.4842813008, 15.5))
        make_face()
    extrude(amount=-F5_DEPTH, mode=Mode.SUBTRACT)

    # F6 (on face) → F7 (join)
    with BuildSketch(Plane.XY.offset(6)):
        Polygon((-101.7832774669, 16.0122346133), (-93.1889638305, 16.0122346133), (-93.1889638305, 26.3799782842), (-99.1367772222, 26.3799782842), (-101.7832774669, 23.7334780395), align=None)
        with Locations((-97.672893, 20.5)):
            Circle(F6_R, mode=Mode.SUBTRACT)
        Polygon((-99.1367772222, -26.3799782842), (-93.1889638305, -26.3799782842), (-93.1889638305, -16.0122346133), (-101.7832774669, -16.0122346133), (-101.7832774669, -23.7334780395), align=None)
        with Locations((-97.672893, -20.5)):
            Circle(F6_R, mode=Mode.SUBTRACT)
    extrude(amount=F7_DEPTH)

    # F8 (on face) → F9 (join)
    with BuildSketch(Plane.XY.offset(6)):
        Polygon((-43.672893, 22), (-45.172893, 20.5), (-45.172893, 15.5), (-37.172893, 15.5), (-37.172893, 20.5), (-38.672893, 22), align=None)
        with Locations((-41.172893, 18.5)):
            Circle(F8_R, mode=Mode.SUBTRACT)
        Polygon((18.627107, 15.5), (18.627107, 20.5), (17.127107, 22), (12.127107, 22), (10.627107, 20.5), (10.627107, 15.5), align=None)
        with Locations((14.627107, 18.5)):
            Circle(F8_R, mode=Mode.SUBTRACT)
        Polygon((10.627107, -15.5), (10.627107, -20.5), (12.127107, -22), (17.127107, -22), (18.627107, -20.5), (18.627107, -15.5), align=None)
        with Locations((14.627107, -18.5)):
            Circle(F8_R, mode=Mode.SUBTRACT)
        Polygon((-38.672893, -22), (-37.172893, -20.5), (-37.172893, -15.5), (-45.172893, -15.5), (-45.172893, -20.5), (-43.672893, -22), align=None)
        with Locations((-41.172893, -18.5)):
            Circle(F8_R, mode=Mode.SUBTRACT)
    extrude(amount=F9_DEPTH)

    # F10 (on face) → F11 (cut)
    with BuildSketch(Plane.XY.offset(6)):
        Polygon((99.2892167695, -13.7000000645), (102.6728926683, -13.7000000645), (102.672892, 13.7), (99.2892167695, 13.7000000645), (90.4360420234, 19.3481259693), (70.672892, 19.3481259693), (70.672892, -19.3481259693), (90.4360420234, -19.3481259693), align=None)
        with Locations((87.672892, -12.75)):
            Circle(F10_R, mode=Mode.SUBTRACT)
        with Locations((87.672892, 12.75)):
            Circle(F10_R, mode=Mode.SUBTRACT)
    extrude(amount=-F11_DEPTH, mode=Mode.SUBTRACT)


solid = f1.part
